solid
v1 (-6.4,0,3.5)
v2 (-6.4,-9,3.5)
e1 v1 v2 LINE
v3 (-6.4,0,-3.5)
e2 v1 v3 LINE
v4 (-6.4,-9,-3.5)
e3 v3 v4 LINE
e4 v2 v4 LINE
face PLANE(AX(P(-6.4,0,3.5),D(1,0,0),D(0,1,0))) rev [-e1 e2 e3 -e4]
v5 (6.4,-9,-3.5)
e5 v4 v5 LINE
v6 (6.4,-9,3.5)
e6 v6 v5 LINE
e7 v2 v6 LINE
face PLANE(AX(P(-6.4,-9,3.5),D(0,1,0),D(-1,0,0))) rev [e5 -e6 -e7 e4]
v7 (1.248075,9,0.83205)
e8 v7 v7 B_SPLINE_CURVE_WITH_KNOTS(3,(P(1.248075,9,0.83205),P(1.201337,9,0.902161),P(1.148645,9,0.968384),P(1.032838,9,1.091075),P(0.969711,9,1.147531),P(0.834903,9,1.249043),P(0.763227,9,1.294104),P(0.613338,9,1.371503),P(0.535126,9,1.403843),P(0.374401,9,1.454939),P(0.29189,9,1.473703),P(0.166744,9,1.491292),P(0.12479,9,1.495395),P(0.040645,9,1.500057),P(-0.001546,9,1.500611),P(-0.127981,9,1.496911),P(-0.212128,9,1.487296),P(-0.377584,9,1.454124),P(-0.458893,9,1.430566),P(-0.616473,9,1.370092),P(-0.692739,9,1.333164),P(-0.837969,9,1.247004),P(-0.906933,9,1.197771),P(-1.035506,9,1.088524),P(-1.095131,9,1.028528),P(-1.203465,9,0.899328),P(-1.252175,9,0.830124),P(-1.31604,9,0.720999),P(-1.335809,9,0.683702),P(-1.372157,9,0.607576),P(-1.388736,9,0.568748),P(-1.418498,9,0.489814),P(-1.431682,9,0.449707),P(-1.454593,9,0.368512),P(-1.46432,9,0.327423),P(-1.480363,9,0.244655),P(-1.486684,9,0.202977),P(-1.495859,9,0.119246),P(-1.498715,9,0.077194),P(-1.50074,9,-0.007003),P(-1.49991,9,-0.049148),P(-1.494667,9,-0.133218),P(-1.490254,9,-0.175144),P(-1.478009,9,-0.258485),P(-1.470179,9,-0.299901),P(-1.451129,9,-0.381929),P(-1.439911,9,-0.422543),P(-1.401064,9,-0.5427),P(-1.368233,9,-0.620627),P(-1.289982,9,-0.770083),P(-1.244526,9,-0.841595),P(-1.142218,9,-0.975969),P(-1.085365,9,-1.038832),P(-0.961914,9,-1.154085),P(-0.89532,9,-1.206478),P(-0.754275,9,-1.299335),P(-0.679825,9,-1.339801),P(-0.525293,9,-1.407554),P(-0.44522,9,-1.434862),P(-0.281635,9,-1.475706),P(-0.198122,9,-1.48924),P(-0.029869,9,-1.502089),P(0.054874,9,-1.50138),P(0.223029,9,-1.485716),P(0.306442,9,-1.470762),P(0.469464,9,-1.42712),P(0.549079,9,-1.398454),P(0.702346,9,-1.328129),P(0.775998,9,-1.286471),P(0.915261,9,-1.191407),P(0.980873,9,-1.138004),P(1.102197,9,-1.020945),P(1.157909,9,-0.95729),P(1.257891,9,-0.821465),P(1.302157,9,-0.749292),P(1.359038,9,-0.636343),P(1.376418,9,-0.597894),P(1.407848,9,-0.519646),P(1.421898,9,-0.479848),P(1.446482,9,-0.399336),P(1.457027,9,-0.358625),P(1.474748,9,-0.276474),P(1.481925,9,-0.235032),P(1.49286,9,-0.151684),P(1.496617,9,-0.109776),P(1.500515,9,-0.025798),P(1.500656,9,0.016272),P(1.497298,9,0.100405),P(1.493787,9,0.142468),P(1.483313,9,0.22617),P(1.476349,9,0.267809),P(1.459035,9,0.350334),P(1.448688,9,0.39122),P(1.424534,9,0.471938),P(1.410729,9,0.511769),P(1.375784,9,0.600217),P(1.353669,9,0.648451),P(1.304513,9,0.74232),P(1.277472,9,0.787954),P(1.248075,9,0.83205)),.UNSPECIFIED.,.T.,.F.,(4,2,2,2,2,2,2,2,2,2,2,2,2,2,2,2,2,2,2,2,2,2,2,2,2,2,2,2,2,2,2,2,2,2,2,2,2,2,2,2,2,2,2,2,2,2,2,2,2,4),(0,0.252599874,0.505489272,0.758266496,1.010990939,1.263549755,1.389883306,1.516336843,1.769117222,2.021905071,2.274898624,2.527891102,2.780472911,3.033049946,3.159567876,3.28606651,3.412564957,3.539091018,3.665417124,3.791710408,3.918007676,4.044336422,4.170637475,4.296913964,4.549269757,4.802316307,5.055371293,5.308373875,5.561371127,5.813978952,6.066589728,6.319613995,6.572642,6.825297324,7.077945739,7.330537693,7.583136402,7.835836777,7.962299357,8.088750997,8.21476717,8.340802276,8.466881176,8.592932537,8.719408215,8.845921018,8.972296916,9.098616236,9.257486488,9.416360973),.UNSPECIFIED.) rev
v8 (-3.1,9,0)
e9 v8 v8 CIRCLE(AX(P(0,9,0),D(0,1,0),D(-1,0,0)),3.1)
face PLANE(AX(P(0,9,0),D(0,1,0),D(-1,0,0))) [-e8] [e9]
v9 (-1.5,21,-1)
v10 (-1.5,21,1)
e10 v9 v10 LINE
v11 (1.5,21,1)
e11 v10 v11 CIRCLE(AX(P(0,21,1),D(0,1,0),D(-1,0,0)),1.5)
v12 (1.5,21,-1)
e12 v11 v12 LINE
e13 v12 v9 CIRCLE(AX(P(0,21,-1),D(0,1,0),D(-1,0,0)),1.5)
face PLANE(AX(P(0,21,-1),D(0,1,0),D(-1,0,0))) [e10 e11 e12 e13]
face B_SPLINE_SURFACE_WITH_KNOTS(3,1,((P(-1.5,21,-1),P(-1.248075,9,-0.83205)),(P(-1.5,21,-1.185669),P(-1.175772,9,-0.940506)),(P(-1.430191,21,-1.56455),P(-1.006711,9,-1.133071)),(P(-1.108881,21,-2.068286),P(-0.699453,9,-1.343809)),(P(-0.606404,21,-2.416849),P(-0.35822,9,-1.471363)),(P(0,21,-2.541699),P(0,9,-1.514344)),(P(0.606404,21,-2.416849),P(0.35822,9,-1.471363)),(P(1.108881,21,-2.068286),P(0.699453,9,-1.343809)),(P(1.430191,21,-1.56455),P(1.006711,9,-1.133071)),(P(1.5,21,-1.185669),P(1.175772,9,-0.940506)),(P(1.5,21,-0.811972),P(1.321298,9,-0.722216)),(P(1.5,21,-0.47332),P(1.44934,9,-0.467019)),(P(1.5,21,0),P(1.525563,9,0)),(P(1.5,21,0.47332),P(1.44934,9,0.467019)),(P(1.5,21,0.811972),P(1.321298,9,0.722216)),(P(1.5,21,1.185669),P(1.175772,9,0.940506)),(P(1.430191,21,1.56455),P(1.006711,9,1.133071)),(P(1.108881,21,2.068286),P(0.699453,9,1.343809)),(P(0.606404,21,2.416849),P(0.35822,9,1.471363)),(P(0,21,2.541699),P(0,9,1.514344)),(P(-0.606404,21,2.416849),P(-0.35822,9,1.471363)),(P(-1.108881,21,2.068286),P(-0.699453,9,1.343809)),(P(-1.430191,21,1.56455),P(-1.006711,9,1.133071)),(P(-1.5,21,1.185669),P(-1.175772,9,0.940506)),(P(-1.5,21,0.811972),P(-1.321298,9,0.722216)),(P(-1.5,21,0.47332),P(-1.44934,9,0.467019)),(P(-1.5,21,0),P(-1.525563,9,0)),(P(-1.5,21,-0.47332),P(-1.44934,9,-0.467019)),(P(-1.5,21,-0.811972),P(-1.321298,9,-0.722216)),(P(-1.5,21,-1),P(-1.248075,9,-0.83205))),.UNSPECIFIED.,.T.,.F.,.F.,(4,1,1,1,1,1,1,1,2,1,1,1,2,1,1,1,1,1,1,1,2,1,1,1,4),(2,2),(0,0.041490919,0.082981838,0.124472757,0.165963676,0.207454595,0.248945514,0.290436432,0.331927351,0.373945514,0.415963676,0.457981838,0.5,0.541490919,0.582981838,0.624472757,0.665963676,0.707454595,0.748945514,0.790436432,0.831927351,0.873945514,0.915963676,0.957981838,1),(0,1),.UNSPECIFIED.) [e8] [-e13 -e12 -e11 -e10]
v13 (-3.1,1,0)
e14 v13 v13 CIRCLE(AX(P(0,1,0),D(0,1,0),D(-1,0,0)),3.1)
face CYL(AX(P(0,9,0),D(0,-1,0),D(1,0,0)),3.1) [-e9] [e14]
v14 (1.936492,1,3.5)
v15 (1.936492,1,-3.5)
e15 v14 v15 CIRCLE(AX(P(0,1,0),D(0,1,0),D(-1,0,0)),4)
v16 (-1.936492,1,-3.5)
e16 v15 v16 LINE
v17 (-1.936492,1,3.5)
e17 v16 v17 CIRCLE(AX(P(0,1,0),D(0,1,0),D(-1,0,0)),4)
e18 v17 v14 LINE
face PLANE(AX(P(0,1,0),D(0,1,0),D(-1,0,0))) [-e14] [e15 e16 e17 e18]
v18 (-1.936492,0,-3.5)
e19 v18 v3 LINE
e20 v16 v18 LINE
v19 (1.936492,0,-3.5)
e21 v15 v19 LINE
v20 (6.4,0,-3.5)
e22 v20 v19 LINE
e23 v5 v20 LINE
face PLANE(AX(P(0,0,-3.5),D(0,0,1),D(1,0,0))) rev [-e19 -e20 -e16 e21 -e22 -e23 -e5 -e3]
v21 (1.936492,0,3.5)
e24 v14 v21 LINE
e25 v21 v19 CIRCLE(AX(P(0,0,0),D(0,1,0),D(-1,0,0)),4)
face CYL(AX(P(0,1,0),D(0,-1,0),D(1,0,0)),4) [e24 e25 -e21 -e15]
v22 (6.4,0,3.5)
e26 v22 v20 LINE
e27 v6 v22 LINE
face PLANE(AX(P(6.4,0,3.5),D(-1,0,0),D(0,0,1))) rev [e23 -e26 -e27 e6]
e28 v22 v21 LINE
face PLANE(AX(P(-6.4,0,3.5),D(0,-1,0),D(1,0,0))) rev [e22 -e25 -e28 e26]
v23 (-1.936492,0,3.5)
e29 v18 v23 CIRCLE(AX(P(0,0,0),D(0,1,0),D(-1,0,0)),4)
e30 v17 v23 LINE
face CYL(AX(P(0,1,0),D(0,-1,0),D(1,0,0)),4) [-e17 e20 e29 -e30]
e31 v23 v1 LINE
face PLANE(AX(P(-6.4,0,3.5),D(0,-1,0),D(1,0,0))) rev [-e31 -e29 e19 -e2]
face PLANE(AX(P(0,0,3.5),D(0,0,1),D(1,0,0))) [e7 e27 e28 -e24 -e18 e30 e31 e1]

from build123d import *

# Parameters (mm, degrees)
ESQUISSE1_W        = 12.8
ESQUISSE1_H        = 9
BOSS_EXTRU_1_DEPTH = 3.5
BOSS_EXTRU_2_DEPTH = 1
ESQUISSE3_R        = 3.1
BOSS_EXTRU_3_DEPTH = 8


with BuildPart() as part:
    # Esquisse1 → Boss.-Extru.1 (new, symmetric)
    with BuildSketch(Plane.XY):
        with Locations((0, -4.5)):
            Rectangle(ESQUISSE1_W, ESQUISSE1_H)
    extrude(amount=BOSS_EXTRU_1_DEPTH, both=True)

    # Esquisse2 → Boss.-Extru.2 (add)
    with BuildSketch(Plane(origin=(0, 0, 0), x_dir=(1, 0, 0), z_dir=(0, 1, 0))):
        with BuildLine():
            Line((1.936491673, 3.5), (-1.936491673, 3.5))
            ThreePointArc((-1.936491673, 3.5), (-4, 0), (-1.936491673, -3.5))
            Line((-1.936491673, -3.5), (1.936491673, -3.5))
            ThreePointArc((1.936491673, -3.5), (4, 0), (1.936491673, 3.5))
        make_face()
    extrude(amount=BOSS_EXTRU_2_DEPTH)

    # Esquisse3 → Boss.-Extru.3 (add)
    with BuildSketch(Plane(origin=(0, 1, 0), x_dir=(1, 0, 0), z_dir=(0, 1, 0))):
        with Locations(Location((0, 0, 0), (0, 0, 180))):
            Circle(ESQUISSE3_R)
    extrude(amount=BOSS_EXTRU_3_DEPTH)

    # Lissage1: read off the stored shape, not the designer's step
    # Lissage1: loft between two sections, ruled curve by curve
    lissage1_from = [
        Edge.make_bspline([(-1.5, 21, -0.999999999), (-1.5, 21, -1.18566879), (-1.430190912, 21, -1.564549941), (-1.108880999, 21, -2.068285581), (-0.606403504, 21, -2.416848616), (0, 21, -2.541699349), (0.606403504, 21, -2.416848616), (1.108880999, 21, -2.068285581), (1.430190912, 21, -1.564549941), (1.5, 21, -1.18566879), (1.5, 21, -0.811971834), (1.5, 21, -0.473320268), (1.5, 21, 0), (1.5, 21, 0.473320268), (1.5, 21, 0.811971834), (1.5, 21, 1.18566879), (1.430190912, 21, 1.564549941), (1.108880999, 21, 2.068285581), (0.606403504, 21, 2.416848616), (0, 21, 2.541699349), (-0.606403504, 21, 2.416848616), (-1.108880999, 21, 2.068285581), (-1.430190912, 21, 1.564549941), (-1.5, 21, 1.18566879), (-1.5, 21, 0.811971834), (-1.5, 21, 0.473320268), (-1.5, 21, 0), (-1.5, 21, -0.473320268), (-1.5, 21, -0.811971834), (-1.5, 21, -0.999999999)], [0, 0, 0, 0, 0.041490919, 0.082981838, 0.124472757, 0.165963676, 0.207454595, 0.248945514, 0.290436432, 0.331927351, 0.331927351, 0.373945514, 0.415963676, 0.457981838, 0.5, 0.5, 0.541490919, 0.582981838, 0.624472757, 0.665963676, 0.707454595, 0.748945514, 0.790436432, 0.831927351, 0.831927351, 0.873945514, 0.915963676, 0.957981838, 1, 1, 1, 1], 3),
    ]
    lissage1_to = [
        Edge.make_bspline([(-1.248075441, 9, -0.832050294), (-1.175771622, 9, -0.940506024), (-1.006710877, 9, -1.133071374), (-0.699452785, 9, -1.34380864), (-0.358220052, 9, -1.471362722), (0, 9, -1.514343967), (0.358220052, 9, -1.471362722), (0.699452785, 9, -1.34380864), (1.006710877, 9, -1.133071374), (1.175771622, 9, -0.940506024), (1.321298058, 9, -0.72221637), (1.449339658, 9, -0.467018972), (1.525563306, 9, 0), (1.449339658, 9, 0.467018972), (1.321298058, 9, 0.72221637), (1.175771622, 9, 0.940506024), (1.006710877, 9, 1.133071374), (0.699452785, 9, 1.34380864), (0.358220052, 9, 1.471362722), (0, 9, 1.514343967), (-0.358220052, 9, 1.471362722), (-0.699452785, 9, 1.34380864), (-1.006710877, 9, 1.133071374), (-1.175771622, 9, 0.940506024), (-1.321298058, 9, 0.72221637), (-1.449339658, 9, 0.467018972), (-1.525563306, 9, 0), (-1.449339658, 9, -0.467018972), (-1.321298058, 9, -0.72221637), (-1.248075441, 9, -0.832050294)], [0, 0, 0, 0, 0.041490919, 0.082981838, 0.124472757, 0.165963676, 0.207454595, 0.248945514, 0.290436432, 0.331927351, 0.331927351, 0.373945514, 0.415963676, 0.457981838, 0.5, 0.5, 0.541490919, 0.582981838, 0.624472757, 0.665963676, 0.707454595, 0.748945514, 0.790436432, 0.831927351, 0.831927351, 0.873945514, 0.915963676, 0.957981838, 1, 1, 1, 1], 3),
    ]
    lissage1 = Solid(Shell([*[Face.make_surface_from_curves(lissage1_from[k], lissage1_to[k]) for k in range(1)], Face(Wire(lissage1_from)), Face(Wire(lissage1_to))]))
    add(lissage1)


solid = part.part
